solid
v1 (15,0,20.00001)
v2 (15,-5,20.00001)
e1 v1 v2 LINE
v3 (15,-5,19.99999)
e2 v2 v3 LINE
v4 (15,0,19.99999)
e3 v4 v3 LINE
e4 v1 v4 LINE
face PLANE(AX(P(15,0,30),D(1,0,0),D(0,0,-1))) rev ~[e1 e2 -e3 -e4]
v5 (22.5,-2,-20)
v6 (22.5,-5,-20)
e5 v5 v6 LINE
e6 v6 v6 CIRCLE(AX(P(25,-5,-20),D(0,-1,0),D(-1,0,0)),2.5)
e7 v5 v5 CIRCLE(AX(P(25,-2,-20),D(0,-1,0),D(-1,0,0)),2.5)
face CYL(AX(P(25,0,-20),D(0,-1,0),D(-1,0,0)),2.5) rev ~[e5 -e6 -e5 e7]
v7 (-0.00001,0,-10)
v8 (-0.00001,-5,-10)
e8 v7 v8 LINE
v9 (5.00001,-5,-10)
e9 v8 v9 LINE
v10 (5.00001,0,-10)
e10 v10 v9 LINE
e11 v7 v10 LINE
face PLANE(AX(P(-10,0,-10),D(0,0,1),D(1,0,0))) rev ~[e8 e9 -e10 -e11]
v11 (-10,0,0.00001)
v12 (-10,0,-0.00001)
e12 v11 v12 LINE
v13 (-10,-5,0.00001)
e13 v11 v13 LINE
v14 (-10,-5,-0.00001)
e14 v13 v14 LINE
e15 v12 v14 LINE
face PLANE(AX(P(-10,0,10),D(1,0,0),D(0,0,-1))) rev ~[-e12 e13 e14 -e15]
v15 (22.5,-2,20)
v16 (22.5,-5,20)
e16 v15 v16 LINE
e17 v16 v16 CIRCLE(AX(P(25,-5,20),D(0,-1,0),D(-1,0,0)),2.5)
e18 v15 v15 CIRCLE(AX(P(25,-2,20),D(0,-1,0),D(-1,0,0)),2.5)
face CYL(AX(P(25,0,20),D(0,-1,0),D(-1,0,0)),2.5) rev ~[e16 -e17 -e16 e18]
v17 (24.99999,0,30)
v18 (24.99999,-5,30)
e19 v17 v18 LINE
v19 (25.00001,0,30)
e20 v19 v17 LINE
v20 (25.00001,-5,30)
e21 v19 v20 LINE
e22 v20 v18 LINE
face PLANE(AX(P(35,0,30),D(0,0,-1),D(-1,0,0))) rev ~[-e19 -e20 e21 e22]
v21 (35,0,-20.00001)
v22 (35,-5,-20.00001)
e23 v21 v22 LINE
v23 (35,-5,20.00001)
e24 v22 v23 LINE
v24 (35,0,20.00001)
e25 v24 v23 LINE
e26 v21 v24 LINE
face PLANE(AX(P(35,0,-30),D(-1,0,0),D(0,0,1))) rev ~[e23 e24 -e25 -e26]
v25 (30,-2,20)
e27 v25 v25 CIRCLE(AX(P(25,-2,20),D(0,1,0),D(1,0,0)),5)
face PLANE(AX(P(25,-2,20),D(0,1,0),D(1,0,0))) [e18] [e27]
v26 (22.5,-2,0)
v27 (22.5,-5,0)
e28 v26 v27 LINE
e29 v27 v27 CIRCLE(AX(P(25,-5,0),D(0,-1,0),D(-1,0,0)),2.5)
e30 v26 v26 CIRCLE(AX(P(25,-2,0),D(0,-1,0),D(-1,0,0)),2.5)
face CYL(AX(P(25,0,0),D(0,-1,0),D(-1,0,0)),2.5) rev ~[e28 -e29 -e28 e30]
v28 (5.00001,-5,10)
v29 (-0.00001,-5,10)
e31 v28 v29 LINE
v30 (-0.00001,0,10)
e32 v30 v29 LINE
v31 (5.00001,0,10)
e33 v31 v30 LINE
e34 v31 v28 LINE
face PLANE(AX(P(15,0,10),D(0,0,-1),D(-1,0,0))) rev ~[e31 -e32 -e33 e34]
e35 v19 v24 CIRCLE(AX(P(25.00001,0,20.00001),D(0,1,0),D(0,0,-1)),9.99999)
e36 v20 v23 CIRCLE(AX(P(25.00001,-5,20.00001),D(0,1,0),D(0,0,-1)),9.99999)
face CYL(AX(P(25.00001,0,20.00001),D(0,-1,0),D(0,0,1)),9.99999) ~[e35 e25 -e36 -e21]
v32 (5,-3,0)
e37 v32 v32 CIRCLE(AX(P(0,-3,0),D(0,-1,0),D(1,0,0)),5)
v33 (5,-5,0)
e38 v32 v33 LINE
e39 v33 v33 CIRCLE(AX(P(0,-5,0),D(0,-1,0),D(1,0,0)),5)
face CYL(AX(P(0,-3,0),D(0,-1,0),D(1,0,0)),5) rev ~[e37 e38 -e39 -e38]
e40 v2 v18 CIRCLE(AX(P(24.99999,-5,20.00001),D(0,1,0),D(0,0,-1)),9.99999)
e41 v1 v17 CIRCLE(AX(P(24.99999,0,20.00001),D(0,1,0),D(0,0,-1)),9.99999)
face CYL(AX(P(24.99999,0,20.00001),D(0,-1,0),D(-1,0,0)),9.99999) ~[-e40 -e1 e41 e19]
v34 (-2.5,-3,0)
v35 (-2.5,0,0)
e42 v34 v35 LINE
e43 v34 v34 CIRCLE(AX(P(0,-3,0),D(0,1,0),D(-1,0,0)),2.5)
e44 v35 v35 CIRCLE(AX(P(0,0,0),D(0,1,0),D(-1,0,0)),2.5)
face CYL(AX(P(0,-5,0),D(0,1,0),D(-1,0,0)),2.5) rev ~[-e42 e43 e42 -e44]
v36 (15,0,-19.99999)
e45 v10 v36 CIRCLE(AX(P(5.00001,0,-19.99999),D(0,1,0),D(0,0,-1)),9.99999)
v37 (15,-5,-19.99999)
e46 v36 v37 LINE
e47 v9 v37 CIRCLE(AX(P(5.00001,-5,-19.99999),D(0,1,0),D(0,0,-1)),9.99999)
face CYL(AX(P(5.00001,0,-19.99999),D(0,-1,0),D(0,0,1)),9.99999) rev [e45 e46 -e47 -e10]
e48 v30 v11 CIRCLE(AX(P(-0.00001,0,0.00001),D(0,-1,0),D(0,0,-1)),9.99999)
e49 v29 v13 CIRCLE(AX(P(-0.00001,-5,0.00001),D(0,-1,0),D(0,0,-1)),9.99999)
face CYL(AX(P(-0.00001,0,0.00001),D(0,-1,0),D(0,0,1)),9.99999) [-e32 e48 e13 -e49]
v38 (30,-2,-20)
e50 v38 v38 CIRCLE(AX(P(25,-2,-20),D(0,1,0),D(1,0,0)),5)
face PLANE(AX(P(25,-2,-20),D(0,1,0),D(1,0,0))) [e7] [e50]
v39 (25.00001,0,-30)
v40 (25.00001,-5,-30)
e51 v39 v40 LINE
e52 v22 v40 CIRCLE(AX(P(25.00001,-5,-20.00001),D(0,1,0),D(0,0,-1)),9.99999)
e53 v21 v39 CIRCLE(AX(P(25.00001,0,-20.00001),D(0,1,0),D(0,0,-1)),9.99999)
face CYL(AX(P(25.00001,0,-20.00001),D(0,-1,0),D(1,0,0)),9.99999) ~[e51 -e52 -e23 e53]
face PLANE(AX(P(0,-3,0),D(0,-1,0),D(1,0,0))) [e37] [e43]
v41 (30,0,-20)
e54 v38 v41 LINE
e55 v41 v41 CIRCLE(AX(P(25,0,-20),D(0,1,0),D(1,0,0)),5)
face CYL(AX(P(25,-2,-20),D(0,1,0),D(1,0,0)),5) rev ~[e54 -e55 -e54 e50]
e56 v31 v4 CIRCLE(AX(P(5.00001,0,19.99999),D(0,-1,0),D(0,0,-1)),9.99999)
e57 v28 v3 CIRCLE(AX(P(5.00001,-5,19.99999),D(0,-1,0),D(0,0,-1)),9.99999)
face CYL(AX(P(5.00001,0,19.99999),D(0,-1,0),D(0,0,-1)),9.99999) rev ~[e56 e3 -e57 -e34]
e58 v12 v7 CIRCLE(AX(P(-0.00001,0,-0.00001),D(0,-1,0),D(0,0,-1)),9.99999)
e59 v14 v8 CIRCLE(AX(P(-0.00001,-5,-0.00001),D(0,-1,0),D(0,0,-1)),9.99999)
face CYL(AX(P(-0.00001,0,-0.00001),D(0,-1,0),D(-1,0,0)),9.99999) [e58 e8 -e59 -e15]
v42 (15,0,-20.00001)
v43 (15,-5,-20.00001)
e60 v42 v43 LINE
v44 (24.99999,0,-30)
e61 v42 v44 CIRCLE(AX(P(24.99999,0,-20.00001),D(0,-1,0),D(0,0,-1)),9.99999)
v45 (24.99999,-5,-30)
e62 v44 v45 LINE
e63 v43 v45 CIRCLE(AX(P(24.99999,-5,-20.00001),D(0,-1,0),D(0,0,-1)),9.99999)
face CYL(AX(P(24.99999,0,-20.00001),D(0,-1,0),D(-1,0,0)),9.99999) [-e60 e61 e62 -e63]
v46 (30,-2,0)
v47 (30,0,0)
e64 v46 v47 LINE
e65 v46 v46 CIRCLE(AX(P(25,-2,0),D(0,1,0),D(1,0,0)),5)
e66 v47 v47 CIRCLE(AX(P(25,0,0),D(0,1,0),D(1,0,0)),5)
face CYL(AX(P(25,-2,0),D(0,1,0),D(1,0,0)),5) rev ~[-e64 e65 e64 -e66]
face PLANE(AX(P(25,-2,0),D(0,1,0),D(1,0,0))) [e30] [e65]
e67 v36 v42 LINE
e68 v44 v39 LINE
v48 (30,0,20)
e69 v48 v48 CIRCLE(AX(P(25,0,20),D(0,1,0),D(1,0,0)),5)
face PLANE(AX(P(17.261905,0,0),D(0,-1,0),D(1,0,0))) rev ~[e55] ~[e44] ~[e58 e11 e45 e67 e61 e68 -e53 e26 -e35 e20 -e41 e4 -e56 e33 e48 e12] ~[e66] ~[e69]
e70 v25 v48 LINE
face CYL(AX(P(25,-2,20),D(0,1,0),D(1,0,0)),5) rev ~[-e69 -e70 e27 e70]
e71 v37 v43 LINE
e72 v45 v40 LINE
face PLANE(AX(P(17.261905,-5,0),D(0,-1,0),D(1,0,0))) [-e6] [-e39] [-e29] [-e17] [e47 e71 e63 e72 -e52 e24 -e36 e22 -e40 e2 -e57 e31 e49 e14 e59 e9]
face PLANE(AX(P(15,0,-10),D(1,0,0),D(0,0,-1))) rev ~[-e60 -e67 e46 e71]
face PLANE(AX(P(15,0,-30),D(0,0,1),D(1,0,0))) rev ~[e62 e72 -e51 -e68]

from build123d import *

# Parameters (mm, degrees)
F1_DEPTH       = 5
F2_D           = 5
F2_CBORE_D     = 10
F2_CBORE_DEPTH = 2
F3_R           = 9.99999
F5_D           = 5
F5_CBORE_D     = 10
F5_CBORE_DEPTH = 2


# Not quite as in the source:
# - a fillet or chamfer is up to 0.001 mm smaller than in the source, because OpenCascade refuses the exact size


with BuildPart() as f1:
    # F0 (on Front) → F1 (new body)
    with BuildSketch(Plane.XZ):
        Polygon((15, 10), (-10, 10), (-10, -10), (15, -10), (15, -30), (35, -30), (35, -10), (35, 10), (35, 30), (15, 30), align=None)
    extrude(amount=F1_DEPTH)

    # F2 (through all)
    with Locations(Plane(origin=(0, 0, 0), x_dir=(1, 0, 0), z_dir=(0, 1, 0))):
        with Locations((25, -20), (25, 20), (25, 0)):
            CounterBoreHole(F2_D / 2, F2_CBORE_D / 2, F2_CBORE_DEPTH)

    # F3 (radius 10 in the source; OpenCascade refuses exactly that, so slightly less here)
    f3_edges = [f1.edges().sort_by_distance(p)[0] for p in [
        (35, -2.5, 30),
        (35, -2.5, -30),
        (15, -2.5, -30),
        (15, -2.5, 30),
        (-10, -2.5, 10),
        (-10, -2.5, -10),
        (15, -2.5, 10),
        (15, -2.5, -10),
    ]]
    fillet(f3_edges, radius=F3_R)

    # F5 (through all)
    with Locations(Plane.XZ.offset(5)):
        with Locations((0, 0)):
            CounterBoreHole(F5_D / 2, F5_CBORE_D / 2, F5_CBORE_DEPTH)


solid = f1.part
